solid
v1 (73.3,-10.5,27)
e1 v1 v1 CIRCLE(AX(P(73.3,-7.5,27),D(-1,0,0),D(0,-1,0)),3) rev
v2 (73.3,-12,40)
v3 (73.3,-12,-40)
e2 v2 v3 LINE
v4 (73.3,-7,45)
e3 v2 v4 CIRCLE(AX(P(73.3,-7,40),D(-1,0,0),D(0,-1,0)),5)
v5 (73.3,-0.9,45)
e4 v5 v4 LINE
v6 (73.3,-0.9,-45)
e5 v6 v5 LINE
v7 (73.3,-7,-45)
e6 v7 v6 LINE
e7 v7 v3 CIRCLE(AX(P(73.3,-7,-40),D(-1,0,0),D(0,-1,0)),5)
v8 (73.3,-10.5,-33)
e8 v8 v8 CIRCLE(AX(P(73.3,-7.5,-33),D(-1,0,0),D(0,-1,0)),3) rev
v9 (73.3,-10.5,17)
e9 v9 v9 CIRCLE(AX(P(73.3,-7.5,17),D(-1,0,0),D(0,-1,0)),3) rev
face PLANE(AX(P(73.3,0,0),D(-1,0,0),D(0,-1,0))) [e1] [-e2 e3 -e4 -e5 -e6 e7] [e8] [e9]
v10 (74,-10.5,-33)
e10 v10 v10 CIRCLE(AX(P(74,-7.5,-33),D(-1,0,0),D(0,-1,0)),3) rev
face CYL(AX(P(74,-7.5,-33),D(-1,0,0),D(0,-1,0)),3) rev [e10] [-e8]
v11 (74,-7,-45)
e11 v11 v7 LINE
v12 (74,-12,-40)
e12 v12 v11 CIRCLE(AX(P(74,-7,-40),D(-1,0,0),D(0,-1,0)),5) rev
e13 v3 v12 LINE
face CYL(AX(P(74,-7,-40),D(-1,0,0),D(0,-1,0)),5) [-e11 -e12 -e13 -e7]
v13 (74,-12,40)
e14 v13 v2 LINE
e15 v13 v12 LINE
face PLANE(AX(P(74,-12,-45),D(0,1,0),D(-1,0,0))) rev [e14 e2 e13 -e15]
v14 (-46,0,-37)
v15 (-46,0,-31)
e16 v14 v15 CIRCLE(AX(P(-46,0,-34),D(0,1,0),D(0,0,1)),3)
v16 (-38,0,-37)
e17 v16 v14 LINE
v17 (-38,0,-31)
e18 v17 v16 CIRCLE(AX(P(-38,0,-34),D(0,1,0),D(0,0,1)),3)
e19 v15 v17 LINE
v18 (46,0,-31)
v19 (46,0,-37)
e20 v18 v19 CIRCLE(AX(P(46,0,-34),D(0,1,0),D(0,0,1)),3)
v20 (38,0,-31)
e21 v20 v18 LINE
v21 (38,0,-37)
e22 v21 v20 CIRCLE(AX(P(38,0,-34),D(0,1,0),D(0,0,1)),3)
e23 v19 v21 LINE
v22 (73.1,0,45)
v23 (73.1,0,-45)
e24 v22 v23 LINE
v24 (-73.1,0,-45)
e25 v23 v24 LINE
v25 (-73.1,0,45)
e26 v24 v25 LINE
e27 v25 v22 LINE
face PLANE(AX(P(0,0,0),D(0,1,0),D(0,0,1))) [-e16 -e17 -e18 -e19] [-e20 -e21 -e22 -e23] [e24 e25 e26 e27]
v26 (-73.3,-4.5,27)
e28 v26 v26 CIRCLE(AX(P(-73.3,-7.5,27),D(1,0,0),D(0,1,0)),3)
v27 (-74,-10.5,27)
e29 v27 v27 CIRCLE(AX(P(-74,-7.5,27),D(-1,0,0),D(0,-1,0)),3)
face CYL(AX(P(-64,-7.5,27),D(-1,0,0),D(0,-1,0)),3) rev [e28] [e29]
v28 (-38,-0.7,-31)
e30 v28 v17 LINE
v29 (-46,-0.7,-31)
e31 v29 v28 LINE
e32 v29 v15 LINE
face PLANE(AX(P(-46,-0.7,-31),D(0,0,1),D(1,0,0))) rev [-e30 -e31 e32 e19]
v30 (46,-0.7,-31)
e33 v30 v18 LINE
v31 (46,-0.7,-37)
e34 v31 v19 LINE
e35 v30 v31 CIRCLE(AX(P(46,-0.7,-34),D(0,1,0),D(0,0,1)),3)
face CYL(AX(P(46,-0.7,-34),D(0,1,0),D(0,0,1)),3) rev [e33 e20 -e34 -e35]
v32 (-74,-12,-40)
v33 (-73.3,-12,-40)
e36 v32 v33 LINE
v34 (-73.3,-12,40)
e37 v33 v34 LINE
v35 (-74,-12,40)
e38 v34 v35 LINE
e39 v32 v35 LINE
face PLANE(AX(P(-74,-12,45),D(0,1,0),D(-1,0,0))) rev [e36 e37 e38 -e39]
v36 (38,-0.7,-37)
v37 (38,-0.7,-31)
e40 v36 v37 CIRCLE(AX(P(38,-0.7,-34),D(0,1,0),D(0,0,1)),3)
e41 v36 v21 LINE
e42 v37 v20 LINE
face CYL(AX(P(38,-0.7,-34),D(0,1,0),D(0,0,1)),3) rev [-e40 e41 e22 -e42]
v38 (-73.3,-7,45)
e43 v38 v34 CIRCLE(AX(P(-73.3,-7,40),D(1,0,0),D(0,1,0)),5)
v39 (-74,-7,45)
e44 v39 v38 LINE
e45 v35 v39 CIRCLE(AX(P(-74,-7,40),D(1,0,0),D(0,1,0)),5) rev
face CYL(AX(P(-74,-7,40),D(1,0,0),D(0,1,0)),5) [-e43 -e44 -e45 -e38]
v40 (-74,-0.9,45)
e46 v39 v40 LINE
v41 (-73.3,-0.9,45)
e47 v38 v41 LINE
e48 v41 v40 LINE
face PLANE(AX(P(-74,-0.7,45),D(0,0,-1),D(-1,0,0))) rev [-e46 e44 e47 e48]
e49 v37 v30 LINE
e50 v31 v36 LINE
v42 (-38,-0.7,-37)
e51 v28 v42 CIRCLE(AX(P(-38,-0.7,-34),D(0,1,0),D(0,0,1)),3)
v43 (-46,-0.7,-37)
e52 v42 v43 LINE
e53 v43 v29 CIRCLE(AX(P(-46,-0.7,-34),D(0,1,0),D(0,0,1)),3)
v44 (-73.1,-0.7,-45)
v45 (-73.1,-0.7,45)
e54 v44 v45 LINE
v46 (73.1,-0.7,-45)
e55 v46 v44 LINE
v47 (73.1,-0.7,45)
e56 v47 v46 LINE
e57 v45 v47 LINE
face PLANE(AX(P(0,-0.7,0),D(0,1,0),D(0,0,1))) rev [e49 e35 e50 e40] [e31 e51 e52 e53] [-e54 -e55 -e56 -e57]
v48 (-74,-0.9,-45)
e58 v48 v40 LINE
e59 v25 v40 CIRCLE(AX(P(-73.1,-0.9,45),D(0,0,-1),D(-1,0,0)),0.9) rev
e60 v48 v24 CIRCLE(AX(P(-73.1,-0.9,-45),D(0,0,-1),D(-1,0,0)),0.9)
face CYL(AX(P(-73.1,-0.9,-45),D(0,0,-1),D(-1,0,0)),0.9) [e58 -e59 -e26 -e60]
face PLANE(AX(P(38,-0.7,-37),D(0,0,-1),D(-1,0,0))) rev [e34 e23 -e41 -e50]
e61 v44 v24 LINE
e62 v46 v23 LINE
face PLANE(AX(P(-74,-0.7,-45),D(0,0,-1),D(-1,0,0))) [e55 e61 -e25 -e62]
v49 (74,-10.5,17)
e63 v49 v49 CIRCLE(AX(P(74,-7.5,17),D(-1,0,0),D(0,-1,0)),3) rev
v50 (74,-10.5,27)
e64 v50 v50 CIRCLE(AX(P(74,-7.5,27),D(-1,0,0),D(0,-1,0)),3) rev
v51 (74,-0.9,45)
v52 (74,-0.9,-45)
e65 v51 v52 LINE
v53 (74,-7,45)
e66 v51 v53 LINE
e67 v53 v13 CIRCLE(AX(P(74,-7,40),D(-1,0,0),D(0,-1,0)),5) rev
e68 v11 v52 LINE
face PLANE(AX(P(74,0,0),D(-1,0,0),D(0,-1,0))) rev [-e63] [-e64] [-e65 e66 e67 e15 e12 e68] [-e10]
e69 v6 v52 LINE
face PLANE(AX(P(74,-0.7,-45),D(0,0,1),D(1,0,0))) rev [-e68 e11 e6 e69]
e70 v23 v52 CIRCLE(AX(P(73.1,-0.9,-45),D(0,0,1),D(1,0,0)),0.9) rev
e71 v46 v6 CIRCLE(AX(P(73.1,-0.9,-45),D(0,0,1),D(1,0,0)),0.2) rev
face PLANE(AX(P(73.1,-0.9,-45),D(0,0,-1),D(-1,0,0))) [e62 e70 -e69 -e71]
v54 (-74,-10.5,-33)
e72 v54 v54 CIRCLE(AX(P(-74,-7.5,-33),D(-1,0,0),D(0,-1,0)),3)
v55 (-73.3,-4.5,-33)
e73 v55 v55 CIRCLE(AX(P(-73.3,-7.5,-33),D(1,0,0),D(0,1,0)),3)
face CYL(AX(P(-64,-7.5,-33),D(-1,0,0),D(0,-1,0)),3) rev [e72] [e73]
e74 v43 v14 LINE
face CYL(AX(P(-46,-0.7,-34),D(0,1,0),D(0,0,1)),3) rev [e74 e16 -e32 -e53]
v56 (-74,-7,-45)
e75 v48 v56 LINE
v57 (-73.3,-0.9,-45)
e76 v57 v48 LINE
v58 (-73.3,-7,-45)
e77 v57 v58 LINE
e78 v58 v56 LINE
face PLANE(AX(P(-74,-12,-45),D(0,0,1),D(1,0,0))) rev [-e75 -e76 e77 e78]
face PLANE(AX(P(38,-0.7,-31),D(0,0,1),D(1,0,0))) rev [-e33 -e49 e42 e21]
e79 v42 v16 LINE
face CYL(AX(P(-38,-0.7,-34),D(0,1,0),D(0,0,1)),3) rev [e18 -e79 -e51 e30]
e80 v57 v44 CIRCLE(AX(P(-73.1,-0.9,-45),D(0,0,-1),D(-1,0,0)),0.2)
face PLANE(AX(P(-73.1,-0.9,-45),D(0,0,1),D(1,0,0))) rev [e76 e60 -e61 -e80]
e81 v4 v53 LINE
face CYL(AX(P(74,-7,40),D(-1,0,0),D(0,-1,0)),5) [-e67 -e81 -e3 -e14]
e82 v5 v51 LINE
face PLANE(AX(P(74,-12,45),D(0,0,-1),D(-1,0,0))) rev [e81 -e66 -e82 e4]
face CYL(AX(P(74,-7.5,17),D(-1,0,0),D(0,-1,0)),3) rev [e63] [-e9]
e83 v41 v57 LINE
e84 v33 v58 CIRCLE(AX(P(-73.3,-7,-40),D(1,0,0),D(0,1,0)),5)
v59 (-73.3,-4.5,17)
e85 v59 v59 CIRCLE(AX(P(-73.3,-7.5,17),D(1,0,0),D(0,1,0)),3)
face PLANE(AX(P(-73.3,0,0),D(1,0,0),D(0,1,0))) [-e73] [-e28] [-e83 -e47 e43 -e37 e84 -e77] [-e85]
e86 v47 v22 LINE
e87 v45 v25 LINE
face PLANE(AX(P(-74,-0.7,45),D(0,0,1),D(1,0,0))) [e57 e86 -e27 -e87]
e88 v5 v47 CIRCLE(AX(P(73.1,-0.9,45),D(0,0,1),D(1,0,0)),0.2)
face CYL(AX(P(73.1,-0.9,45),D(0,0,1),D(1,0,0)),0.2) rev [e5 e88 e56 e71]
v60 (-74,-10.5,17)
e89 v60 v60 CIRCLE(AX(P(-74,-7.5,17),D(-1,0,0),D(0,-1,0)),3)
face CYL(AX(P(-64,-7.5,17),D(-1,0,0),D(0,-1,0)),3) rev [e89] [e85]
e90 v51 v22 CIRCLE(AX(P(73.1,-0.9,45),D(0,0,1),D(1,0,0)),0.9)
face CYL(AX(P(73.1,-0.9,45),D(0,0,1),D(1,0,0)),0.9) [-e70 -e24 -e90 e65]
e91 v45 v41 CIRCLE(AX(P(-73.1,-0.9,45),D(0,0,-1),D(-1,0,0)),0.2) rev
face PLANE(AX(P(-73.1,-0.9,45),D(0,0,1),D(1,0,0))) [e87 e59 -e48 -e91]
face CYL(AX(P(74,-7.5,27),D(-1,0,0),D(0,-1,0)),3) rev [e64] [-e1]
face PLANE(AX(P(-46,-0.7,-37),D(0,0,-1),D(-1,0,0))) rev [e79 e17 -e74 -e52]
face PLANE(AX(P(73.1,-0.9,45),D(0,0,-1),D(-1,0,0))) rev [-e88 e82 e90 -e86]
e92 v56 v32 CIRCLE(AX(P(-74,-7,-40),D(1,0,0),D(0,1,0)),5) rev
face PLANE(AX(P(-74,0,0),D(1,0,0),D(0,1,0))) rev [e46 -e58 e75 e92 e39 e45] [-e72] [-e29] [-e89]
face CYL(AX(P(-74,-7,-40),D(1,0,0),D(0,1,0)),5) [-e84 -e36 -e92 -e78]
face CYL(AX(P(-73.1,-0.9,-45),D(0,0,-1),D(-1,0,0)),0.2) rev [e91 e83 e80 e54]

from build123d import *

# Parameters (mm, degrees)
SKETCH_1_W                         = 148
SKETCH_1_H                         = 90
SM_BASE_FLANGE_1_DEPTH             = 0.7
SM_EDGE_FLANGE_1_STRIP_W           = 3.2
SM_EDGE_FLANGE_1_STRIP_H           = 0.7
SM_EDGE_FLANGE_1_STRIP_CUT_DEPTH   = 90
SM_EDGE_FLANGE_1_STRIP_2_W         = 3.2
SM_EDGE_FLANGE_1_STRIP_2_H         = 0.7
SM_EDGE_FLANGE_1_STRIP_CUT_2_DEPTH = 90
SM_EDGE_FLANGE_1_DEPTH             = 90
SM_EDGE_FLANGE_1_PROFILE_W         = 90
SM_EDGE_FLANGE_1_PROFILE_H         = 11.1
SM_EDGE_FLANGE_1_PROFILE_R         = 3
SM_EDGE_FLANGE_1_FLAT_DEPTH        = 0.7
SM_EDGE_FLANGE_1_BEND_DEPTH        = 90
FILLET_2_R                         = 5
CUT_EXTRUDE_START                  = -10
SKETCH_15_R                        = 3
CUT_EXTRUDE_1_DEPTH                = 10


# Sheet-metal steps are written as plain solids
with BuildPart() as part:
    # Sketch 1 → 基体-法兰1 (new body)
    with BuildSketch(Plane(origin=(0, 0, 0), x_dir=(1, 0, 0), z_dir=(0, 1, 0))):
        Rectangle(SKETCH_1_W, SKETCH_1_H)
        with BuildLine():
            Line((-46, 37), (-38, 37))
            ThreePointArc((-38, 37), (-35, 34), (-38, 31))
            Line((-38, 31), (-46, 31))
            ThreePointArc((-46, 31), (-49, 34), (-46, 37))
        make_face(mode=Mode.SUBTRACT)
        with BuildLine():
            Line((38, 37), (46, 37))
            ThreePointArc((46, 37), (49, 34), (46, 31))
            Line((46, 31), (38, 31))
            ThreePointArc((38, 31), (35, 34), (38, 37))
        make_face(mode=Mode.SUBTRACT)
    extrude(amount=-SM_BASE_FLANGE_1_DEPTH)

    # 边线-法兰1 strip (across the edge) → 边线-法兰1 strip cut (cut)
    with BuildSketch(Plane(origin=(74, -0.7, -45), x_dir=(-1, 0, 0), z_dir=(0, 0, 1))):
        with Locations((-0.7, -0.35)):
            Rectangle(SM_EDGE_FLANGE_1_STRIP_W, SM_EDGE_FLANGE_1_STRIP_H)
    extrude(amount=SM_EDGE_FLANGE_1_STRIP_CUT_DEPTH, mode=Mode.SUBTRACT)

    # 边线-法兰1 strip 2 (across the edge) → 边线-法兰1 strip cut 2 (cut)
    with BuildSketch(Plane(origin=(-74, -0.7, 45), x_dir=(1, 0, 0), z_dir=(0, 0, -1))):
        with Locations((-0.7, -0.35)):
            Rectangle(SM_EDGE_FLANGE_1_STRIP_2_W, SM_EDGE_FLANGE_1_STRIP_2_H)
    extrude(amount=SM_EDGE_FLANGE_1_STRIP_CUT_2_DEPTH, mode=Mode.SUBTRACT)

    # 边线-法兰1 bend section (across the edge) → 边线-法兰1 (add)
    with BuildSketch(Plane(origin=(74, -0.7, -45), x_dir=(-1, 0, 0), z_dir=(0, 0, 1))):
        with BuildLine():
            Line((0, 0.2), (0.7, 0.2))
            ThreePointArc((0.7, 0.2), (0.758578644, 0.058578644), (0.9, 0))
            Line((0.9, 0), (0.9, -0.7))
            ThreePointArc((0.9, -0.7), (0.263603897, -0.436396103), (0, 0.2))
        make_face()
    extrude(amount=SM_EDGE_FLANGE_1_DEPTH)

    # 边线-法兰1 profile (on flange) → 边线-法兰1 flat (add)
    with BuildSketch(Plane(origin=(74, -0.7, 0), x_dir=(0, 0, 1), z_dir=(1, 0, 0))):
        with Locations((0, 5.75)):
            Rectangle(SM_EDGE_FLANGE_1_PROFILE_W, SM_EDGE_FLANGE_1_PROFILE_H)
        with Locations((17, 6.8)):
            Circle(SM_EDGE_FLANGE_1_PROFILE_R, mode=Mode.SUBTRACT)
        with Locations((27, 6.8)):
            Circle(SM_EDGE_FLANGE_1_PROFILE_R, mode=Mode.SUBTRACT)
        with Locations((-33, 6.8)):
            Circle(SM_EDGE_FLANGE_1_PROFILE_R, mode=Mode.SUBTRACT)
    extrude(amount=-SM_EDGE_FLANGE_1_FLAT_DEPTH)

    # 边线-法兰1 section (across the edge) → 边线-法兰1 bend (add)
    with BuildSketch(Plane(origin=(-74, -0.7, 45), x_dir=(1, 0, 0), z_dir=(0, 0, -1))):
        with BuildLine():
            Line((0, 0.2), (0, 11.3))
            Line((0, 11.3), (0.7, 11.3))
            Line((0.7, 11.3), (0.7, 0.2))
            ThreePointArc((0.7, 0.2), (0.758578644, 0.058578644), (0.9, 0))
            Line((0.9, 0), (0.9, -0.7))
            ThreePointArc((0.9, -0.7), (0.263603897, -0.436396103), (0, 0.2))
        make_face()
    extrude(amount=SM_EDGE_FLANGE_1_BEND_DEPTH)

    # 圆角2
    fillet_2_edges = [part.edges().sort_by_distance(p)[0] for p in [
        (-73.65, -12, 45),
        (-73.65, -12, -45),
        (73.65, -12, -45),
        (73.65, -12, 45),
    ]]
    fillet(fillet_2_edges, radius=FILLET_2_R)

    # 草图15 → 切除-拉伸1 (cut)
    with BuildSketch(Plane.ZY.offset(74).offset(CUT_EXTRUDE_START)):
        with Locations(Location((-33, -7.5, 0), (0, 0, 270))):
            Circle(SKETCH_15_R)
        with Locations(Location((17, -7.5, 0), (0, 0, 270))):
            Circle(SKETCH_15_R)
        with Locations(Location((27, -7.5, 0), (0, 0, 270))):
            Circle(SKETCH_15_R)
    extrude(amount=CUT_EXTRUDE_1_DEPTH, mode=Mode.SUBTRACT)


solid = part.part
